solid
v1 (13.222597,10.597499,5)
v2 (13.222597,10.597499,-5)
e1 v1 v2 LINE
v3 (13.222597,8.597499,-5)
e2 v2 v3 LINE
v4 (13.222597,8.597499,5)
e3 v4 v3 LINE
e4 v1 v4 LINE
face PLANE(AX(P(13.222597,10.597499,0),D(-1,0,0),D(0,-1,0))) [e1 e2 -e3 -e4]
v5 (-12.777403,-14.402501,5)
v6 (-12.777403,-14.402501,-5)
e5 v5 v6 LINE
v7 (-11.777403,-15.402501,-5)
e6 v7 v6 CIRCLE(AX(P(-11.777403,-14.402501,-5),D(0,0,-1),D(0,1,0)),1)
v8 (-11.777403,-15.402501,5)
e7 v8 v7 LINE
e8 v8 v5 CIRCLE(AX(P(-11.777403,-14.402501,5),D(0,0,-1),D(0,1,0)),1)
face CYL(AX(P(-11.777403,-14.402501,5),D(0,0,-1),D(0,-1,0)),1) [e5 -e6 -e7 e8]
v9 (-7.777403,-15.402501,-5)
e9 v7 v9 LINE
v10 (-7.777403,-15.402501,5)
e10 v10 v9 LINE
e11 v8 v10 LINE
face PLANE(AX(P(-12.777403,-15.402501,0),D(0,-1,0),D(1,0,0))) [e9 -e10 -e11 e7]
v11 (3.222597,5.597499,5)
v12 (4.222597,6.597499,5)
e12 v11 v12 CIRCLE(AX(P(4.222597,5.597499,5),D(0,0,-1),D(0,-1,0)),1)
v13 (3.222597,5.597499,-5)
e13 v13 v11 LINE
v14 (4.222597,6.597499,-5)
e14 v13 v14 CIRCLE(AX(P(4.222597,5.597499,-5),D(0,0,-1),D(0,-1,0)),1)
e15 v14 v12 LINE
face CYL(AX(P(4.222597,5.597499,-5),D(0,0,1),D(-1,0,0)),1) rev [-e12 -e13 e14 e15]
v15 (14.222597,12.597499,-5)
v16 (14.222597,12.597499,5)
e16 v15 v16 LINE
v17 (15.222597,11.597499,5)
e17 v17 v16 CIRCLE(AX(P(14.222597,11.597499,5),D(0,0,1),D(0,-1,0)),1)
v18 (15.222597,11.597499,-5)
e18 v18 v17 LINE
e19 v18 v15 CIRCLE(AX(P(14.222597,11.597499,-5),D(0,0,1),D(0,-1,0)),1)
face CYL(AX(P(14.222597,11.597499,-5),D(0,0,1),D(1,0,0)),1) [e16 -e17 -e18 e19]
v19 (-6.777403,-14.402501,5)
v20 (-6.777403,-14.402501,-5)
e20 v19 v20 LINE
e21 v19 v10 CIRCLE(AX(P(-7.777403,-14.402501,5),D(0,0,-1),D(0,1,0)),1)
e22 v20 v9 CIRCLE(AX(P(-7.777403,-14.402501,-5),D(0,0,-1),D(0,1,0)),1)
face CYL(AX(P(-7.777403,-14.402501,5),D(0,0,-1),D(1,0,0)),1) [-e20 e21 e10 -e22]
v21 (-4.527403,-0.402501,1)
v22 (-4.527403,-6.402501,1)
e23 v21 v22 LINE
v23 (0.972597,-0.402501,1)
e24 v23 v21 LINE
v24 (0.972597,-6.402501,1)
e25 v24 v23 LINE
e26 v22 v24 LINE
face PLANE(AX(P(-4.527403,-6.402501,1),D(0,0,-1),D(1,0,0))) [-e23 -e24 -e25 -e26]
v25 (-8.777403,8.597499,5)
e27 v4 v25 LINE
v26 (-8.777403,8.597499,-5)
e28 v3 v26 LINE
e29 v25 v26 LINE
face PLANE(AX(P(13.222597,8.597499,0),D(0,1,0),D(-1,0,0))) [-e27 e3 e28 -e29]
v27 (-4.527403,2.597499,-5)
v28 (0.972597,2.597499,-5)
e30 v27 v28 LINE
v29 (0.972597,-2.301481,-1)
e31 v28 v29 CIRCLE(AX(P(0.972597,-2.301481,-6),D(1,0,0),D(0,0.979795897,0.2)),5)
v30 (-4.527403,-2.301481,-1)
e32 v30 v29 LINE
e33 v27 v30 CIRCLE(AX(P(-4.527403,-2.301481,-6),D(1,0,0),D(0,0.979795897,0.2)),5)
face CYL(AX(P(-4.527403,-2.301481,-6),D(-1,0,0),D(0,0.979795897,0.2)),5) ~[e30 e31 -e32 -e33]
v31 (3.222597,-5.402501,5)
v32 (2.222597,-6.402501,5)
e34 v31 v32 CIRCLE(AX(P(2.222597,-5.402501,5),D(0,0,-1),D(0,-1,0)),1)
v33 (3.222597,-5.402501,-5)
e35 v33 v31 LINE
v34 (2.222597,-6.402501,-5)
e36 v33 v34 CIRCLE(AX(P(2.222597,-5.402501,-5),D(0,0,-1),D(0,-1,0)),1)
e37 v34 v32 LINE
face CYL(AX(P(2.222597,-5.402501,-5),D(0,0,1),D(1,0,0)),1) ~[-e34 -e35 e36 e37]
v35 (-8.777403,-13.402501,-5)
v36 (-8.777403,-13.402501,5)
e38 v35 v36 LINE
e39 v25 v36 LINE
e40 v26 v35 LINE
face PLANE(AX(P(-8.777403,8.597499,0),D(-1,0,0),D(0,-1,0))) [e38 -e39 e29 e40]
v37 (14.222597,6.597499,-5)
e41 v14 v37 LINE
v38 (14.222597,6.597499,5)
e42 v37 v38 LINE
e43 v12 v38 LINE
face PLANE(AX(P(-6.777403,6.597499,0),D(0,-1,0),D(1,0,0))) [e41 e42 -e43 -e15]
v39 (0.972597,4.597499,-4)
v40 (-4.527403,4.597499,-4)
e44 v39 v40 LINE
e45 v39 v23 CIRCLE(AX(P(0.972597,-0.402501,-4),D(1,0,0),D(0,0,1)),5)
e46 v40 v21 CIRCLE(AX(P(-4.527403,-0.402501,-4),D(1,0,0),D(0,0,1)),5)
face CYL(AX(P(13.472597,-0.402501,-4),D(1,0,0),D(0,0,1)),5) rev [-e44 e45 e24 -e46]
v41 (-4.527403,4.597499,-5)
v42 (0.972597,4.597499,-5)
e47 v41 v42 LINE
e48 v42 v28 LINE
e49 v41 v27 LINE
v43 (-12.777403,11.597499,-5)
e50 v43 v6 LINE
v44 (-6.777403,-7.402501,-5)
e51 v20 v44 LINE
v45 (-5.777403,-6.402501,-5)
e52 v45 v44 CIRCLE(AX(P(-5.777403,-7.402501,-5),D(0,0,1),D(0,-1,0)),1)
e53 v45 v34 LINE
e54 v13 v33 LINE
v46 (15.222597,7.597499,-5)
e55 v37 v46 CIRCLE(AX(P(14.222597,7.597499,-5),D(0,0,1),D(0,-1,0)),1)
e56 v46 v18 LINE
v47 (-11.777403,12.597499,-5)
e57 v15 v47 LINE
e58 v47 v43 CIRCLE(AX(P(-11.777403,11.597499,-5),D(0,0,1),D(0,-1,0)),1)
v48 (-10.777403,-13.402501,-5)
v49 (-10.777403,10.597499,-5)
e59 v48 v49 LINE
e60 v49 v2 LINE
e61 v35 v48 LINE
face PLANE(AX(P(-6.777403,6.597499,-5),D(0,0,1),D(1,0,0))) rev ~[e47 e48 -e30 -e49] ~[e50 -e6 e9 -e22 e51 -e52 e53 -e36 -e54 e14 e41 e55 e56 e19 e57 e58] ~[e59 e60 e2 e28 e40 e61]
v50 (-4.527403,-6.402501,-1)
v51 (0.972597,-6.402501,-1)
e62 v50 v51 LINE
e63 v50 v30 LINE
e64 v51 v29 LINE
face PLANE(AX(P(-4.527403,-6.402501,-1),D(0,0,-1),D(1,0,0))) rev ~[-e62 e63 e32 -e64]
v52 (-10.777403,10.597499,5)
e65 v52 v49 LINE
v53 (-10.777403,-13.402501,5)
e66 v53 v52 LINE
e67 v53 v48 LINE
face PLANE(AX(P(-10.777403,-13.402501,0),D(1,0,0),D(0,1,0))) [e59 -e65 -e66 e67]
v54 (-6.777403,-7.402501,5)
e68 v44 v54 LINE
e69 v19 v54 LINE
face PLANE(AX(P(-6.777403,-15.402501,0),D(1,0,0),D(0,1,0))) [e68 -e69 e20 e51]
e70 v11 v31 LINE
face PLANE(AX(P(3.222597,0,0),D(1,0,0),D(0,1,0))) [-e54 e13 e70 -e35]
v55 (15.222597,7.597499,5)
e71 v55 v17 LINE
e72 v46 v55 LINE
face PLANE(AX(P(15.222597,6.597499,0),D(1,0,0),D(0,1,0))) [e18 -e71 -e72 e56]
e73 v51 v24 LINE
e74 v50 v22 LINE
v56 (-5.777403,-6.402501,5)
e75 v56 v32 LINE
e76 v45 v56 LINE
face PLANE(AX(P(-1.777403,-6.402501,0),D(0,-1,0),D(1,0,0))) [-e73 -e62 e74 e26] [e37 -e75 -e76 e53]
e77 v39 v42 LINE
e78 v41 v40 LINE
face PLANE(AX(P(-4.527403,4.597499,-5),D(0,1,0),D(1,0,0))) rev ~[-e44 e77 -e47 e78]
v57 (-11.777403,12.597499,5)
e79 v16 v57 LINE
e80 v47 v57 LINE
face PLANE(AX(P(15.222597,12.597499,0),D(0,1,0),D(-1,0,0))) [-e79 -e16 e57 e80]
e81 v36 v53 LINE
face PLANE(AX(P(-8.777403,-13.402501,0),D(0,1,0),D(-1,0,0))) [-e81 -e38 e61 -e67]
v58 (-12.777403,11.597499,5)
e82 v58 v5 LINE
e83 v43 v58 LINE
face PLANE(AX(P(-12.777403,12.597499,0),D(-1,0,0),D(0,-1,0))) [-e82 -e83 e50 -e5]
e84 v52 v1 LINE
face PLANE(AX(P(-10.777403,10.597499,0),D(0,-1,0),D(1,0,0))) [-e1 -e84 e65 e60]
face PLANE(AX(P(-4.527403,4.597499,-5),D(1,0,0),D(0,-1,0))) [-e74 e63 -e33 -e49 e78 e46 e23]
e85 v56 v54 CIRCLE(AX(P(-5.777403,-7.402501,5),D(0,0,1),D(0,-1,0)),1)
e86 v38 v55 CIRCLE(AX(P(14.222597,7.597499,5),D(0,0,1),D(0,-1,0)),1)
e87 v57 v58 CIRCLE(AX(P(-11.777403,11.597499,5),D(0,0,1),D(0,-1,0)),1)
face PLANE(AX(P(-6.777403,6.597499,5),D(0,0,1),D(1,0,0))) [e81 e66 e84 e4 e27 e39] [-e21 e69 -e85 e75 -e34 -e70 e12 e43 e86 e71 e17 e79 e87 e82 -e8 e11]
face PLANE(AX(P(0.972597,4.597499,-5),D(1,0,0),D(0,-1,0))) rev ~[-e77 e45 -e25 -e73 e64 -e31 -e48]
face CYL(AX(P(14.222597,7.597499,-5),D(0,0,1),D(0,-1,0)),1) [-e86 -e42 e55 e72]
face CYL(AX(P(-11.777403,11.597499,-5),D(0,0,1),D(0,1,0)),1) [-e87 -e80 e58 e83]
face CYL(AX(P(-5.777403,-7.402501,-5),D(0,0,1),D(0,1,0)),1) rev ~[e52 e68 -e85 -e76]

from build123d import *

# Parameters (mm, degrees)
F1_DEPTH    = 5
F2_W        = 10
F2_H        = 10
F3_DEPTH    = 13
F4_R        = 1
F5_W        = 5.5
F5_H        = 2
F7_DEPTH    = 11
F6_W        = 5.5
F6_H        = 2
F8_DEPTH    = 6
F9_T4_DEPTH = 30.5
F9_T7_DEPTH = 5.5


# Not quite as in the source:
# - a fillet or chamfer that OpenCascade refuses, or shapes differently, is made with other operations: its cross-section is extruded or revolved along the edge and cut away or added


with BuildPart() as f1:
    # F0 (on Top) → F1 (new body, symmetric)
    with BuildSketch(Plane.XY):
        Polygon((-6.777402997, 6.5974989831), (15.222597003, 6.5974989831), (15.222597003, 12.5974989831), (-12.777402997, 12.5974989831), (-12.777402997, -15.4025010169), (-6.777402997, -15.4025010169), align=None)
        Polygon((-8.777402997, -13.4025010169), (-10.777402997, -13.4025010169), (-10.777402997, 10.5974989831), (13.222597003, 10.5974989831), (13.222597003, 8.5974989831), (-8.777402997, 8.5974989831), align=None, mode=Mode.SUBTRACT)
    extrude(amount=F1_DEPTH, both=True)

    # F2 (on face) → F3 (join)
    with BuildSketch(Plane.XZ.offset(-6.5974989831)):
        with Locations((-1.777402997, 0)):
            Rectangle(F2_W, F2_H)
    extrude(amount=F3_DEPTH)

    # F4
    f4_edges = [f1.edges().sort_by_distance(p)[0] for p in [
        (3.222597, 6.597499, 0),
        (-12.777403, 12.597499, 0),
        (15.222597, 12.597499, 0),
        (15.222597, 6.597499, 0),
        (-12.777403, -15.402501, 0),
        (-6.777403, -15.402501, 0),
        (3.222597, -6.402501, 0),
        (-6.777403, -6.402501, 0),
    ]]
    fillet(f4_edges, radius=F4_R)

    # F5 (on face) → F7 (cut)
    with BuildSketch(Plane.XZ.offset(6.4025010169)):
        with Locations((-1.777402997, 0)):
            Rectangle(F5_W, F5_H)
    extrude(amount=-F7_DEPTH, mode=Mode.SUBTRACT)

    # F6 (on face) → F8 (cut, through all)
    with BuildSketch(Plane(origin=(0, 0, -5), x_dir=(1, 0, 0), z_dir=(0, 0, -1))):
        with Locations((-1.777402997, -3.5974989831)):
            Rectangle(F6_W, F6_H)
    extrude(amount=-F8_DEPTH, mode=Mode.SUBTRACT)

    # F9: fillet of radius 5 on 2 edges, made by hand


with BuildPart() as f9_tool2:
    # F9_s3 → F9_t4 (new body)
    with BuildSketch(Plane.YZ.offset(13.472597003)):
        with BuildLine():
            ThreePointArc((-0.4025010169, 1), (3.1330328891, -0.4644660941), (4.5974989831, -4))
            Line((4.5974989831, -4), (4.5974989831, 1))
            Line((4.5974989831, 1), (-0.4025010169, 1))
        make_face()
    extrude(amount=-F9_T4_DEPTH)

    split(bisect_by=Plane.YZ.offset(-8.777402997), keep=Keep.TOP)

    split(bisect_by=Plane.YZ.offset(3.222597003), keep=Keep.BOTTOM)


with BuildPart() as f1_1:
    add(f1.part)

    # F9_t1: union F9_tool2
    add(f9_tool2.part)

    # F9_s8 → F9_t7 (cut)
    with BuildSketch(Plane.YZ.offset(-4.527402997)):
        with BuildLine():
            ThreePointArc((2.5974989831, -5), (0.8607971577, -2.1270166538), (-2.3014805024, -1))
            Line((-2.3014805024, -1), (2.5974989831, -1))
            Line((2.5974989831, -1), (2.5974989831, -5))
        make_face()
    extrude(amount=F9_T7_DEPTH, mode=Mode.SUBTRACT)


solid = f1_1.part
